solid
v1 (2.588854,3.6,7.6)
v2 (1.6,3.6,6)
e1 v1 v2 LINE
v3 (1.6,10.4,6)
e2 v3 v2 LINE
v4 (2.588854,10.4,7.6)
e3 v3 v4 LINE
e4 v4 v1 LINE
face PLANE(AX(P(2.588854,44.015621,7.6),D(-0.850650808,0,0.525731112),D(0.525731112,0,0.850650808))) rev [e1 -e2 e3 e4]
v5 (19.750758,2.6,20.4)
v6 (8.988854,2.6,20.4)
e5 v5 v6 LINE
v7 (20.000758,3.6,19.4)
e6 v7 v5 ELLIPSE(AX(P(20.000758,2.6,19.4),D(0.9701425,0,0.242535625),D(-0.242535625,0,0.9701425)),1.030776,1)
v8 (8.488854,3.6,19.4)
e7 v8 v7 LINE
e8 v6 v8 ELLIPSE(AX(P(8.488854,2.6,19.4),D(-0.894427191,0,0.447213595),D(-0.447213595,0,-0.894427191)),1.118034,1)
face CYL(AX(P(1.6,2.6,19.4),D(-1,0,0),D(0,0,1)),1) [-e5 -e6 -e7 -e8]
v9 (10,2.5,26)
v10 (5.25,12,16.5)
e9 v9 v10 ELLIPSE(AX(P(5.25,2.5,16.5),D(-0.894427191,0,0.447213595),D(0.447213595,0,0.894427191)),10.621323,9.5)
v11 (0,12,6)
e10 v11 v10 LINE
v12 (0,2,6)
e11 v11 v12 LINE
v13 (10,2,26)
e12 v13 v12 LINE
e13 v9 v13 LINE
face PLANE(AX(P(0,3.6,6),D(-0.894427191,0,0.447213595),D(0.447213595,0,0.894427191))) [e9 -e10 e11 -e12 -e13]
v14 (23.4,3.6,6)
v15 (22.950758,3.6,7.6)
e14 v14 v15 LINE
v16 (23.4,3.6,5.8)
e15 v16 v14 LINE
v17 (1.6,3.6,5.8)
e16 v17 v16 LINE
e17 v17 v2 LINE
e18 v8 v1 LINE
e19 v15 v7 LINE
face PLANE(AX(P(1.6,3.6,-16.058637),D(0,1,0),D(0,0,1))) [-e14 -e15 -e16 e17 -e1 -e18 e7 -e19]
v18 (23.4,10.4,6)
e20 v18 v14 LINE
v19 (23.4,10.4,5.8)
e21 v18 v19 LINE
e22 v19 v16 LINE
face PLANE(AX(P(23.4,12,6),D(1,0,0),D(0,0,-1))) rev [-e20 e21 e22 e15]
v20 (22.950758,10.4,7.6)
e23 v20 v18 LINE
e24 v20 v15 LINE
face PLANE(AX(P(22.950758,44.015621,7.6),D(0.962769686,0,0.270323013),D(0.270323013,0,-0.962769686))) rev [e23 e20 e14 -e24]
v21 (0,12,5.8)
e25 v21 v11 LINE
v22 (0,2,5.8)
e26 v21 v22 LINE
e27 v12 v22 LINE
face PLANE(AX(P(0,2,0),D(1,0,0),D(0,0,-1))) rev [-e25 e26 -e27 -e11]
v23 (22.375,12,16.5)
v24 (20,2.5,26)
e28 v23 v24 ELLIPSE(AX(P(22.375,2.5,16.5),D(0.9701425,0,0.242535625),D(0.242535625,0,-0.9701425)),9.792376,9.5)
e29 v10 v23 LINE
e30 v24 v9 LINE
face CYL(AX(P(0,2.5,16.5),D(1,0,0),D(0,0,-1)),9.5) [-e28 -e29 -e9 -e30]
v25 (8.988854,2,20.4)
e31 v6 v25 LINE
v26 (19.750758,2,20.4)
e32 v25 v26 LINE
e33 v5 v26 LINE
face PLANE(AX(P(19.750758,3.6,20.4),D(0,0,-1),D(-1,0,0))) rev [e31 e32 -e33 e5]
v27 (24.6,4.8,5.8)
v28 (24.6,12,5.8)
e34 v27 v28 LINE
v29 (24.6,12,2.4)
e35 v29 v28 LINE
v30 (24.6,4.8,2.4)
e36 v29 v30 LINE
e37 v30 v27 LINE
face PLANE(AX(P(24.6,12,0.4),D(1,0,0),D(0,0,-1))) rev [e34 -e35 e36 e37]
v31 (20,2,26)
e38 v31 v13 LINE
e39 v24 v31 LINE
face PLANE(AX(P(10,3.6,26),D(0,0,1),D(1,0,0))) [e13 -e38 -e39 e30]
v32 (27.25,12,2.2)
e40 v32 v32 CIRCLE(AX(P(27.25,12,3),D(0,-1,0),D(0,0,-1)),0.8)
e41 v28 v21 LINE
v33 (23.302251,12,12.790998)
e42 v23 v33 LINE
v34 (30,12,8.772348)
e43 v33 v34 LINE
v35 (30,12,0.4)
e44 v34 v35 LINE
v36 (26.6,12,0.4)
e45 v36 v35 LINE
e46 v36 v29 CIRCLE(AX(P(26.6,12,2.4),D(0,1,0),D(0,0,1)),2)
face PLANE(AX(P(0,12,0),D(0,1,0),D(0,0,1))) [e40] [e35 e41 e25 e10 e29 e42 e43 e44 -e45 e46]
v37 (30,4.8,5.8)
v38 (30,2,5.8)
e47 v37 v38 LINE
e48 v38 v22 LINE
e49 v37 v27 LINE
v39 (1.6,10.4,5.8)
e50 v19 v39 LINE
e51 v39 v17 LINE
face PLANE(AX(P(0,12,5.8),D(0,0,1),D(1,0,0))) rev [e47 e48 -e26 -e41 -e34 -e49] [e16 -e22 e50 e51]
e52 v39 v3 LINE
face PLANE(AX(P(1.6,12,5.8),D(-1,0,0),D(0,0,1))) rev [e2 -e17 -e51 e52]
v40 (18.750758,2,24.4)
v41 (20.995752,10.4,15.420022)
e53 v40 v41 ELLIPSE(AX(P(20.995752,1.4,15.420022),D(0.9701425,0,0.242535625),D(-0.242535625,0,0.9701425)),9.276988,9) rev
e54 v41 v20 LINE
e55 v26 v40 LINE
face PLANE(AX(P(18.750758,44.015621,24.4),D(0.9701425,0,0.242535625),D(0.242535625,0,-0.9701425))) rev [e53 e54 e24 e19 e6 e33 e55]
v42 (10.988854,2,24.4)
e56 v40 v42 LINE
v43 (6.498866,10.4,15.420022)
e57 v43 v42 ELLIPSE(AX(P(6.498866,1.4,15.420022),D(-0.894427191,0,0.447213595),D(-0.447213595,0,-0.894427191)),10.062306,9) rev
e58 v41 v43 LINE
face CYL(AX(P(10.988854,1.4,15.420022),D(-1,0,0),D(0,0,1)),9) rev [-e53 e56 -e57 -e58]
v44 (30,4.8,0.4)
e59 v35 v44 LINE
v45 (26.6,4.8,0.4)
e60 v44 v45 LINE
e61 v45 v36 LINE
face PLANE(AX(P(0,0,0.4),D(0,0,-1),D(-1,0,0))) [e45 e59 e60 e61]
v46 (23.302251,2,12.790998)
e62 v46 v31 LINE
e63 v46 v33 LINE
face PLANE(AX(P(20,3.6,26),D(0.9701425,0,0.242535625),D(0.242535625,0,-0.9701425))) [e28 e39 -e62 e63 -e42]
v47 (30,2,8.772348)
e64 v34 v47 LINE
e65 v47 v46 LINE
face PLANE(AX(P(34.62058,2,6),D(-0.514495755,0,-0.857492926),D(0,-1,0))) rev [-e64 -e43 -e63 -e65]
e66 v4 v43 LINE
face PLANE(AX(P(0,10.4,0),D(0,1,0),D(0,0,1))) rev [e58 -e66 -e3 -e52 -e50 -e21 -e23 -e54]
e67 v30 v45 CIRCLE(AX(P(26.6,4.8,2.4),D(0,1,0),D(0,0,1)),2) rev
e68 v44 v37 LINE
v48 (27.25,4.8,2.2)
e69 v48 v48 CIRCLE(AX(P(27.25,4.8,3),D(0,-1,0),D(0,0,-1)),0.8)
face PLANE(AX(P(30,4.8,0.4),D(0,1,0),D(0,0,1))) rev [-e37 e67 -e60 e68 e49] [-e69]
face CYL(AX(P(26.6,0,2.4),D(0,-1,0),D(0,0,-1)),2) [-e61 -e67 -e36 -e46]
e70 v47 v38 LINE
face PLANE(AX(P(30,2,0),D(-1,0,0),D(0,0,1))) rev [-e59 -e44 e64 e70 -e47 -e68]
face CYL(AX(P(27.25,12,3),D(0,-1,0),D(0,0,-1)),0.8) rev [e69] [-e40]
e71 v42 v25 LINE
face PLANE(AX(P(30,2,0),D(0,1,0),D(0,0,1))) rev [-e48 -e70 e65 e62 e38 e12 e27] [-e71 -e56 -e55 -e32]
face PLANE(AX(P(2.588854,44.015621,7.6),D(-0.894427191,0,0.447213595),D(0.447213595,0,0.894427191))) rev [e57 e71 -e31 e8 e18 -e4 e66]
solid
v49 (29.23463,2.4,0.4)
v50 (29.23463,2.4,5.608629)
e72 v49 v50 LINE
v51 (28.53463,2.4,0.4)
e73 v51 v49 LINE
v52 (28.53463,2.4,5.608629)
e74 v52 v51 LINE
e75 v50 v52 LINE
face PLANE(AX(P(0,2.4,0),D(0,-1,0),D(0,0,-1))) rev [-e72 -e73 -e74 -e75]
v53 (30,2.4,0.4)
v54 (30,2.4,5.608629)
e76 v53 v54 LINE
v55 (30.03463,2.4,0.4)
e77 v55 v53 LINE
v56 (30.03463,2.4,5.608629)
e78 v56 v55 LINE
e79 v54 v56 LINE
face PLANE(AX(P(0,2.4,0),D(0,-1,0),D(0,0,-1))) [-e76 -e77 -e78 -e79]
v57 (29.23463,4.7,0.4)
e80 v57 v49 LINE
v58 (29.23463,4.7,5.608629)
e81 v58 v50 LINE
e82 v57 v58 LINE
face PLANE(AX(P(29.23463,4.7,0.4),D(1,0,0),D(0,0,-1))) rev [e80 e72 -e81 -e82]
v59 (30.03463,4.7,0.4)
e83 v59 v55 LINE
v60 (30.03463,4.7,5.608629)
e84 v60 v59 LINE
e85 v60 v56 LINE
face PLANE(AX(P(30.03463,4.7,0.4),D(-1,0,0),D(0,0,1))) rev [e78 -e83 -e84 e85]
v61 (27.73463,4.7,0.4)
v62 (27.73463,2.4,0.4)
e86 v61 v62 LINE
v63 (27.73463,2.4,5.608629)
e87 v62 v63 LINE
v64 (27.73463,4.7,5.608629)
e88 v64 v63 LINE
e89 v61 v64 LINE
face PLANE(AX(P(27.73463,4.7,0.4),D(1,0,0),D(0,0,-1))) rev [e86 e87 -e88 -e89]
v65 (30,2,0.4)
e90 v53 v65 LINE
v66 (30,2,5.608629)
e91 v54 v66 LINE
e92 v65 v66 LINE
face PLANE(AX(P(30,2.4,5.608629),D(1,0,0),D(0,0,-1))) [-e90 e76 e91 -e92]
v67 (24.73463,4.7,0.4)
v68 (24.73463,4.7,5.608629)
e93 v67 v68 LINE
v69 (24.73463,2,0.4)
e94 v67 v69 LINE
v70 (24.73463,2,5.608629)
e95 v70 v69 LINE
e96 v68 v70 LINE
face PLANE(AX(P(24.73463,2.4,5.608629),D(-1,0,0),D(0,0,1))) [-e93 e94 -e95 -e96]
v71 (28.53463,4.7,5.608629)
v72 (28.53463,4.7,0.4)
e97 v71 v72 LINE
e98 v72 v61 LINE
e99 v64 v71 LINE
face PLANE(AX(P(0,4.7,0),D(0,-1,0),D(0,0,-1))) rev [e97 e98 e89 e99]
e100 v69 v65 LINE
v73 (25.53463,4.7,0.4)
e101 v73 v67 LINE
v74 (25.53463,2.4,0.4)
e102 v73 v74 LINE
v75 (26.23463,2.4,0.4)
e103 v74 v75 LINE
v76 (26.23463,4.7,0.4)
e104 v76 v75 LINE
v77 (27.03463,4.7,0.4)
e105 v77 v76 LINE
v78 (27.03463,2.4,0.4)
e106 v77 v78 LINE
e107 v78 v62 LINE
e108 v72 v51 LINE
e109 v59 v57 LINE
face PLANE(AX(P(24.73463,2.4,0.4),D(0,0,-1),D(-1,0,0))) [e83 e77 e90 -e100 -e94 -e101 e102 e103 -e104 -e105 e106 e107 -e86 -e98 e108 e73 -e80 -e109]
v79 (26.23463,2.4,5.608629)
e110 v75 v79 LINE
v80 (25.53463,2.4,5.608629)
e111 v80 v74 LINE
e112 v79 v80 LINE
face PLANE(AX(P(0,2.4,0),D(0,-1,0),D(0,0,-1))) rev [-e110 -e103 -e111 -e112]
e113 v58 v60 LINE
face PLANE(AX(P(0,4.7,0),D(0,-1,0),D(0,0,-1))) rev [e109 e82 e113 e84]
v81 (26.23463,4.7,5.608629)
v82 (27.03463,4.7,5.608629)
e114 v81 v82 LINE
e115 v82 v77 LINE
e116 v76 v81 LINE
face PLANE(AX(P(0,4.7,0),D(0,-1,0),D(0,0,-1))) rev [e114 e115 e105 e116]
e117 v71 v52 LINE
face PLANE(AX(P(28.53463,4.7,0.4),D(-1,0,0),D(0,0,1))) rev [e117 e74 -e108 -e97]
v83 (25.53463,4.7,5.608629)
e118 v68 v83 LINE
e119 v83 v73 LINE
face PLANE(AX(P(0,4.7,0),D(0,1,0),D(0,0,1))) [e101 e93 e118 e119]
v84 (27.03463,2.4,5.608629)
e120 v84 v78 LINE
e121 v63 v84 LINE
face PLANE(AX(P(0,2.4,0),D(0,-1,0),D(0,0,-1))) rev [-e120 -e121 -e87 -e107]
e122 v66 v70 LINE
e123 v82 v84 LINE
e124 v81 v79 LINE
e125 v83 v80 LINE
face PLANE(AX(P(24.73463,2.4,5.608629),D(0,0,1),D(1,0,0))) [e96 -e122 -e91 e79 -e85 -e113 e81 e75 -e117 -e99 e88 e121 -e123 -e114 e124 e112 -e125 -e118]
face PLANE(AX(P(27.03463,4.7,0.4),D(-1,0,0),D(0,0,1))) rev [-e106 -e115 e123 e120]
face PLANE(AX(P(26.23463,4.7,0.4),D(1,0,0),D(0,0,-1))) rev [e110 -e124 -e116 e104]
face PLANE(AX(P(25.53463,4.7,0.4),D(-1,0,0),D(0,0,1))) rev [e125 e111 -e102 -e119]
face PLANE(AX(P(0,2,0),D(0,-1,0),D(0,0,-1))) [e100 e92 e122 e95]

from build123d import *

# Parameters (mm, degrees)
SKETCH_1_W          = 30
SKETCH_1_H          = 6
EXTRUDE_1_DEPTH     = 2
SKETCH_2_R          = 0.8
CUT_EXTRUDE_1_DEPTH = 2
SKETCH_3_W          = 1.6
SKETCH_3_H          = 0.2
EXTRUDE_2_DEPTH     = 10
SKETCH_4_W          = 21.8
SKETCH_4_H          = 0.2
EXTRUDE_3_DEPTH     = 1.6
SKETCH_5_W          = 5
SKETCH_5_H          = 0.2
EXTRUDE_4_DEPTH     = 10
SKETCH_6_W          = 5.4
SKETCH_6_H          = 7.2
EXTRUDE_5_DEPTH     = 5.4
FILLET_1_R          = 2
SKETCH_7_R          = 0.8
CUT_EXTRUDE_2_DEPTH = 32.429922049
SKETCH_8_W          = 6
SKETCH_8_H          = 2
CUT_EXTRUDE_3_DEPTH = 33.86335345
SKETCH_9_W          = 21.8
SKETCH_9_H          = 1.6
EXTRUDE_7_DEPTH     = 0.2
EXTRUDE_9_DEPTH     = 1.6
EXTRUDE_10_REACH    = 42.578
EXTRUDE_11_DEPTH    = 1.6
CUT_EXTRUDE_4_DEPTH = 1.6
FILLET_2_R          = 9
FILLET_3_R          = 9.5
FILLET_4_R          = 1
CHAMFER_1_SIZE      = 9.620579793
CHAMFER_1_SIZE_2    = 7
SKETCH_16_W         = 5.26536988
SKETCH_16_H         = 5.208629253
EXTRUDE_12_DEPTH    = 0.4
SKETCH_17_W         = 0.8
SKETCH_17_H         = 5.208629253
EXTRUDE_13_DEPTH    = 2.3


with BuildPart() as part:
    # 草图1 → 凸台-拉伸1 (new body)
    with BuildSketch(Plane(origin=(0, 0, 0), x_dir=(1, 0, 0), z_dir=(0, 1, 0))):
        with Locations((15, -3)):
            Rectangle(SKETCH_1_W, SKETCH_1_H)
    extrude(amount=EXTRUDE_1_DEPTH)

    # 草图2 → 切除-拉伸1 (cut)
    with BuildSketch(Plane(origin=(0, 2, 0), x_dir=(1, 0, 0), z_dir=(0, 1, 0))):
        with Locations(Location((27.25, -3, 0), (0, 0, 270))):
            Circle(SKETCH_2_R)
    extrude(amount=-CUT_EXTRUDE_1_DEPTH, mode=Mode.SUBTRACT)

    # 草图3 → 凸台-拉伸2 (add)
    with BuildSketch(Plane(origin=(0, 2, 0), x_dir=(1, 0, 0), z_dir=(0, 1, 0))):
        with Locations((0.8, -5.9)):
            Rectangle(SKETCH_3_W, SKETCH_3_H)
        with Locations((24.2, -5.9)):
            Rectangle(SKETCH_3_W, SKETCH_3_H)
    extrude(amount=EXTRUDE_2_DEPTH)

    # 草图4 → 凸台-拉伸3 (add)
    with BuildSketch(Plane(origin=(0, 12, 0), x_dir=(1, 0, 0), z_dir=(0, 1, 0))):
        with Locations((12.5, -5.9)):
            Rectangle(SKETCH_4_W, SKETCH_4_H)
    extrude(amount=-EXTRUDE_3_DEPTH)

    # 草图5 → 凸台-拉伸4 (add)
    with BuildSketch(Plane(origin=(0, 2, 0), x_dir=(1, 0, 0), z_dir=(0, 1, 0))):
        with Locations((27.5, -5.9)):
            Rectangle(SKETCH_5_W, SKETCH_5_H)
    extrude(amount=EXTRUDE_4_DEPTH)

    # 草图6 → 凸台-拉伸5 (add)
    with BuildSketch(Plane(origin=(0, 0, 5.8), x_dir=(-1, 0, 0), z_dir=(0, 0, -1))):
        with Locations((-27.3, 8.4)):
            Rectangle(SKETCH_6_W, SKETCH_6_H)
    extrude(amount=EXTRUDE_5_DEPTH)

    # 圆角1
    fillet_1_edges = [part.edges().sort_by_distance(p)[0] for p in [
        (24.6, 8.4, 0.4),
    ]]
    fillet(fillet_1_edges, radius=FILLET_1_R)

    # 草图7 → 切除-拉伸2 (cut, through all)
    with BuildSketch(Plane(origin=(0, 4.8, 0), x_dir=(-1, 0, 0), z_dir=(0, -1, 0))):
        with Locations(Location((-27.25, -3, 0), (0, 0, 270))):
            Circle(SKETCH_7_R)
    extrude(amount=-CUT_EXTRUDE_2_DEPTH, mode=Mode.SUBTRACT)

    # 草图8 → 切除-拉伸3 (cut, through all)
    with BuildSketch(Plane.ZY):
        with Locations((3, 1)):
            Rectangle(SKETCH_8_W, SKETCH_8_H)
    extrude(amount=-CUT_EXTRUDE_3_DEPTH, mode=Mode.SUBTRACT)

    # 草图9 → 凸台-拉伸7 (add)
    with BuildSketch(Plane.XY.offset(6)):
        with Locations((12.5, 2.8)):
            Rectangle(SKETCH_9_W, SKETCH_9_H)
    extrude(amount=-EXTRUDE_7_DEPTH)

    # 草图11 → 凸台-拉伸9 (add)
    with BuildSketch(Plane(origin=(0, 2, 0), x_dir=(-1, 0, 0), z_dir=(0, -1, 0))):
        Polygon((0, -6), (-10, -26), (-20, -26), (-25, -6), align=None)
    extrude(amount=-EXTRUDE_9_DEPTH)

    # 凸台-拉伸10: up to this face of the body (flat: up to its plane)
    extrude_10_end = Plane(part.part.faces().sort_by_distance((25.077544524, 12, 3.686395467))[0])
    # 草图12 → 凸台-拉伸10 (add, up to the picked face)
    with BuildSketch(Plane(origin=(0, 3.6, 0), x_dir=(1, 0, 0), z_dir=(0, 1, 0)), mode=Mode.PRIVATE) as extrude_10_sk1:
        Polygon((2.588854382, -7.6), (10.988854382, -24.4), (18.75075775, -24.4), (22.95075775, -7.6), (23.4, -6), (25, -6), (20, -26), (10, -26), (0, -6), (1.6, -6), align=None)
    extrude_10_tool1 = split(extrude(extrude_10_sk1.sketch, amount=EXTRUDE_10_REACH, mode=Mode.PRIVATE), bisect_by=extrude_10_end, keep=Keep.BOTH, mode=Mode.PRIVATE)
    add(extrude_10_tool1.solids().sort_by(Axis((6.502498, 3.6, 16.143178), (0, 1, 0)))[0])

    # 草图13 → 凸台-拉伸11 (add)
    with BuildSketch(Plane(origin=(0, 12, 0), x_dir=(1, 0, 0), z_dir=(0, 1, 0))):
        Polygon((1.6, -5.8), (1.6, -6), (2.588854382, -7.6), (10.988854382, -24.4), (18.75075775, -24.4), (22.95075775, -7.6), (23.4, -6), (23.4, -5.8), align=None)
    extrude(amount=-EXTRUDE_11_DEPTH)

    # 草图15 → 切除-拉伸4 (cut)
    with BuildSketch(Plane.XZ.offset(-2)):
        Polygon((10.988854382, 24.4), (18.75075775, 24.4), (19.75075775, 20.4), (8.988854382, 20.4), align=None)
    extrude(amount=-CUT_EXTRUDE_4_DEPTH, mode=Mode.SUBTRACT)

    # 圆角2
    # the kernel refuses this fillet: 9 mm, written as the material it adds along each edge
    with BuildSketch(Plane(origin=(-11.461089939, 10.4, 24.4), x_dir=(0, -1, 0), z_dir=(1, 0, 0))) as fillet_2_piece_1_section:
        with BuildLine():
            CenterArc((9, 8.979977728), FILLET_2_R, 180, 86.177446271)
            Line((0, 8.979977728), (-0.18, 8.979977728))
            Line((-0.18, 8.979977728), (-0.18, 0))
            Line((-0.18, 0), (0, -0.18))
            ThreePointArc((0, -0.18), (4.2, -0.18), (8.388, -0.179599555))
            Line((8.388, -0.179599555), (8.4, 0))
        make_face()
    fillet_2_piece_1 = extrude(amount=52.661792009, mode=Mode.PRIVATE)
    fillet_2_piece_1 = split(fillet_2_piece_1, bisect_by=Plane(origin=(10.765391635, 8.588071481, 23.953074506), z_dir=(0.8944271909999129, 0, -0.447213595499964)), keep=Keep.TOP, mode=Mode.PRIVATE)
    fillet_2_piece_1 = split(fillet_2_piece_1, bisect_by=Plane(origin=(19.058612592, 8.588071481, 23.168580631), z_dir=(-0.9701425001453267, 0, -0.24253562503635406)), keep=Keep.TOP, mode=Mode.PRIVATE)
    add(fillet_2_piece_1)

    # 圆角3
    fillet_3_edges = [part.edges().sort_by_distance(p)[0] for p in [
        (15, 12, 26),
    ]]
    fillet(fillet_3_edges, radius=FILLET_3_R)

    # 圆角4
    fillet_4_edges = [part.edges().sort_by_distance(p)[0] for p in [
        (14.369806066, 3.6, 20.4),
    ]]
    fillet(fillet_4_edges, radius=FILLET_4_R)

    # 倒角1
    # the kernel refuses this chamfer: 9.620579793, 7 mm, written as the material it adds along each edge
    with BuildSketch(Plane(origin=(25, 12, 6), x_dir=(0.9998021063601228, 0, -0.019893418958582616), z_dir=(0, -1, 0))) as chamfer_1_piece_1_section:
        Polygon((CHAMFER_1_SIZE * 0.999802106371, CHAMFER_1_SIZE * 0.0198934189588), (-CHAMFER_1_SIZE_2 * 0.261787079984, CHAMFER_1_SIZE_2 * 0.965125652314), (0, 0), align=None)
    chamfer_1_piece_1 = extrude(amount=10, mode=Mode.PRIVATE)
    chamfer_1_piece_1 = split(chamfer_1_piece_1, bisect_by=Plane(origin=(30, 7, 8.595881011), z_dir=(-1, 0, 0)), keep=Keep.TOP, mode=Mode.PRIVATE)
    add(chamfer_1_piece_1)


with BuildPart() as body_2:
    # 草图16 → 凸台-拉伸12 (new body)
    with BuildSketch(Plane(origin=(0, 2, 0), x_dir=(-1, 0, 0), z_dir=(0, -1, 0))):
        with Locations((-27.36731506, -3.004314627)):
            Rectangle(SKETCH_16_W, SKETCH_16_H)
    extrude(amount=-EXTRUDE_12_DEPTH)

    # 草图17 → 凸台-拉伸13 (add)
    with BuildSketch(Plane(origin=(0, 2.4, 0), x_dir=(1, 0, 0), z_dir=(0, 1, 0))):
        with Locations((25.13463012, -3.004314627)):
            Rectangle(SKETCH_17_W, SKETCH_17_H)
        with Locations((26.63463012, -3.004314627)):
            Rectangle(SKETCH_17_W, SKETCH_17_H)
        with Locations((28.13463012, -3.004314627)):
            Rectangle(SKETCH_17_W, SKETCH_17_H)
        with Locations((29.63463012, -3.004314627)):
            Rectangle(SKETCH_17_W, SKETCH_17_H)
    extrude(amount=EXTRUDE_13_DEPTH)


solid = Compound([part.part, body_2.part])
